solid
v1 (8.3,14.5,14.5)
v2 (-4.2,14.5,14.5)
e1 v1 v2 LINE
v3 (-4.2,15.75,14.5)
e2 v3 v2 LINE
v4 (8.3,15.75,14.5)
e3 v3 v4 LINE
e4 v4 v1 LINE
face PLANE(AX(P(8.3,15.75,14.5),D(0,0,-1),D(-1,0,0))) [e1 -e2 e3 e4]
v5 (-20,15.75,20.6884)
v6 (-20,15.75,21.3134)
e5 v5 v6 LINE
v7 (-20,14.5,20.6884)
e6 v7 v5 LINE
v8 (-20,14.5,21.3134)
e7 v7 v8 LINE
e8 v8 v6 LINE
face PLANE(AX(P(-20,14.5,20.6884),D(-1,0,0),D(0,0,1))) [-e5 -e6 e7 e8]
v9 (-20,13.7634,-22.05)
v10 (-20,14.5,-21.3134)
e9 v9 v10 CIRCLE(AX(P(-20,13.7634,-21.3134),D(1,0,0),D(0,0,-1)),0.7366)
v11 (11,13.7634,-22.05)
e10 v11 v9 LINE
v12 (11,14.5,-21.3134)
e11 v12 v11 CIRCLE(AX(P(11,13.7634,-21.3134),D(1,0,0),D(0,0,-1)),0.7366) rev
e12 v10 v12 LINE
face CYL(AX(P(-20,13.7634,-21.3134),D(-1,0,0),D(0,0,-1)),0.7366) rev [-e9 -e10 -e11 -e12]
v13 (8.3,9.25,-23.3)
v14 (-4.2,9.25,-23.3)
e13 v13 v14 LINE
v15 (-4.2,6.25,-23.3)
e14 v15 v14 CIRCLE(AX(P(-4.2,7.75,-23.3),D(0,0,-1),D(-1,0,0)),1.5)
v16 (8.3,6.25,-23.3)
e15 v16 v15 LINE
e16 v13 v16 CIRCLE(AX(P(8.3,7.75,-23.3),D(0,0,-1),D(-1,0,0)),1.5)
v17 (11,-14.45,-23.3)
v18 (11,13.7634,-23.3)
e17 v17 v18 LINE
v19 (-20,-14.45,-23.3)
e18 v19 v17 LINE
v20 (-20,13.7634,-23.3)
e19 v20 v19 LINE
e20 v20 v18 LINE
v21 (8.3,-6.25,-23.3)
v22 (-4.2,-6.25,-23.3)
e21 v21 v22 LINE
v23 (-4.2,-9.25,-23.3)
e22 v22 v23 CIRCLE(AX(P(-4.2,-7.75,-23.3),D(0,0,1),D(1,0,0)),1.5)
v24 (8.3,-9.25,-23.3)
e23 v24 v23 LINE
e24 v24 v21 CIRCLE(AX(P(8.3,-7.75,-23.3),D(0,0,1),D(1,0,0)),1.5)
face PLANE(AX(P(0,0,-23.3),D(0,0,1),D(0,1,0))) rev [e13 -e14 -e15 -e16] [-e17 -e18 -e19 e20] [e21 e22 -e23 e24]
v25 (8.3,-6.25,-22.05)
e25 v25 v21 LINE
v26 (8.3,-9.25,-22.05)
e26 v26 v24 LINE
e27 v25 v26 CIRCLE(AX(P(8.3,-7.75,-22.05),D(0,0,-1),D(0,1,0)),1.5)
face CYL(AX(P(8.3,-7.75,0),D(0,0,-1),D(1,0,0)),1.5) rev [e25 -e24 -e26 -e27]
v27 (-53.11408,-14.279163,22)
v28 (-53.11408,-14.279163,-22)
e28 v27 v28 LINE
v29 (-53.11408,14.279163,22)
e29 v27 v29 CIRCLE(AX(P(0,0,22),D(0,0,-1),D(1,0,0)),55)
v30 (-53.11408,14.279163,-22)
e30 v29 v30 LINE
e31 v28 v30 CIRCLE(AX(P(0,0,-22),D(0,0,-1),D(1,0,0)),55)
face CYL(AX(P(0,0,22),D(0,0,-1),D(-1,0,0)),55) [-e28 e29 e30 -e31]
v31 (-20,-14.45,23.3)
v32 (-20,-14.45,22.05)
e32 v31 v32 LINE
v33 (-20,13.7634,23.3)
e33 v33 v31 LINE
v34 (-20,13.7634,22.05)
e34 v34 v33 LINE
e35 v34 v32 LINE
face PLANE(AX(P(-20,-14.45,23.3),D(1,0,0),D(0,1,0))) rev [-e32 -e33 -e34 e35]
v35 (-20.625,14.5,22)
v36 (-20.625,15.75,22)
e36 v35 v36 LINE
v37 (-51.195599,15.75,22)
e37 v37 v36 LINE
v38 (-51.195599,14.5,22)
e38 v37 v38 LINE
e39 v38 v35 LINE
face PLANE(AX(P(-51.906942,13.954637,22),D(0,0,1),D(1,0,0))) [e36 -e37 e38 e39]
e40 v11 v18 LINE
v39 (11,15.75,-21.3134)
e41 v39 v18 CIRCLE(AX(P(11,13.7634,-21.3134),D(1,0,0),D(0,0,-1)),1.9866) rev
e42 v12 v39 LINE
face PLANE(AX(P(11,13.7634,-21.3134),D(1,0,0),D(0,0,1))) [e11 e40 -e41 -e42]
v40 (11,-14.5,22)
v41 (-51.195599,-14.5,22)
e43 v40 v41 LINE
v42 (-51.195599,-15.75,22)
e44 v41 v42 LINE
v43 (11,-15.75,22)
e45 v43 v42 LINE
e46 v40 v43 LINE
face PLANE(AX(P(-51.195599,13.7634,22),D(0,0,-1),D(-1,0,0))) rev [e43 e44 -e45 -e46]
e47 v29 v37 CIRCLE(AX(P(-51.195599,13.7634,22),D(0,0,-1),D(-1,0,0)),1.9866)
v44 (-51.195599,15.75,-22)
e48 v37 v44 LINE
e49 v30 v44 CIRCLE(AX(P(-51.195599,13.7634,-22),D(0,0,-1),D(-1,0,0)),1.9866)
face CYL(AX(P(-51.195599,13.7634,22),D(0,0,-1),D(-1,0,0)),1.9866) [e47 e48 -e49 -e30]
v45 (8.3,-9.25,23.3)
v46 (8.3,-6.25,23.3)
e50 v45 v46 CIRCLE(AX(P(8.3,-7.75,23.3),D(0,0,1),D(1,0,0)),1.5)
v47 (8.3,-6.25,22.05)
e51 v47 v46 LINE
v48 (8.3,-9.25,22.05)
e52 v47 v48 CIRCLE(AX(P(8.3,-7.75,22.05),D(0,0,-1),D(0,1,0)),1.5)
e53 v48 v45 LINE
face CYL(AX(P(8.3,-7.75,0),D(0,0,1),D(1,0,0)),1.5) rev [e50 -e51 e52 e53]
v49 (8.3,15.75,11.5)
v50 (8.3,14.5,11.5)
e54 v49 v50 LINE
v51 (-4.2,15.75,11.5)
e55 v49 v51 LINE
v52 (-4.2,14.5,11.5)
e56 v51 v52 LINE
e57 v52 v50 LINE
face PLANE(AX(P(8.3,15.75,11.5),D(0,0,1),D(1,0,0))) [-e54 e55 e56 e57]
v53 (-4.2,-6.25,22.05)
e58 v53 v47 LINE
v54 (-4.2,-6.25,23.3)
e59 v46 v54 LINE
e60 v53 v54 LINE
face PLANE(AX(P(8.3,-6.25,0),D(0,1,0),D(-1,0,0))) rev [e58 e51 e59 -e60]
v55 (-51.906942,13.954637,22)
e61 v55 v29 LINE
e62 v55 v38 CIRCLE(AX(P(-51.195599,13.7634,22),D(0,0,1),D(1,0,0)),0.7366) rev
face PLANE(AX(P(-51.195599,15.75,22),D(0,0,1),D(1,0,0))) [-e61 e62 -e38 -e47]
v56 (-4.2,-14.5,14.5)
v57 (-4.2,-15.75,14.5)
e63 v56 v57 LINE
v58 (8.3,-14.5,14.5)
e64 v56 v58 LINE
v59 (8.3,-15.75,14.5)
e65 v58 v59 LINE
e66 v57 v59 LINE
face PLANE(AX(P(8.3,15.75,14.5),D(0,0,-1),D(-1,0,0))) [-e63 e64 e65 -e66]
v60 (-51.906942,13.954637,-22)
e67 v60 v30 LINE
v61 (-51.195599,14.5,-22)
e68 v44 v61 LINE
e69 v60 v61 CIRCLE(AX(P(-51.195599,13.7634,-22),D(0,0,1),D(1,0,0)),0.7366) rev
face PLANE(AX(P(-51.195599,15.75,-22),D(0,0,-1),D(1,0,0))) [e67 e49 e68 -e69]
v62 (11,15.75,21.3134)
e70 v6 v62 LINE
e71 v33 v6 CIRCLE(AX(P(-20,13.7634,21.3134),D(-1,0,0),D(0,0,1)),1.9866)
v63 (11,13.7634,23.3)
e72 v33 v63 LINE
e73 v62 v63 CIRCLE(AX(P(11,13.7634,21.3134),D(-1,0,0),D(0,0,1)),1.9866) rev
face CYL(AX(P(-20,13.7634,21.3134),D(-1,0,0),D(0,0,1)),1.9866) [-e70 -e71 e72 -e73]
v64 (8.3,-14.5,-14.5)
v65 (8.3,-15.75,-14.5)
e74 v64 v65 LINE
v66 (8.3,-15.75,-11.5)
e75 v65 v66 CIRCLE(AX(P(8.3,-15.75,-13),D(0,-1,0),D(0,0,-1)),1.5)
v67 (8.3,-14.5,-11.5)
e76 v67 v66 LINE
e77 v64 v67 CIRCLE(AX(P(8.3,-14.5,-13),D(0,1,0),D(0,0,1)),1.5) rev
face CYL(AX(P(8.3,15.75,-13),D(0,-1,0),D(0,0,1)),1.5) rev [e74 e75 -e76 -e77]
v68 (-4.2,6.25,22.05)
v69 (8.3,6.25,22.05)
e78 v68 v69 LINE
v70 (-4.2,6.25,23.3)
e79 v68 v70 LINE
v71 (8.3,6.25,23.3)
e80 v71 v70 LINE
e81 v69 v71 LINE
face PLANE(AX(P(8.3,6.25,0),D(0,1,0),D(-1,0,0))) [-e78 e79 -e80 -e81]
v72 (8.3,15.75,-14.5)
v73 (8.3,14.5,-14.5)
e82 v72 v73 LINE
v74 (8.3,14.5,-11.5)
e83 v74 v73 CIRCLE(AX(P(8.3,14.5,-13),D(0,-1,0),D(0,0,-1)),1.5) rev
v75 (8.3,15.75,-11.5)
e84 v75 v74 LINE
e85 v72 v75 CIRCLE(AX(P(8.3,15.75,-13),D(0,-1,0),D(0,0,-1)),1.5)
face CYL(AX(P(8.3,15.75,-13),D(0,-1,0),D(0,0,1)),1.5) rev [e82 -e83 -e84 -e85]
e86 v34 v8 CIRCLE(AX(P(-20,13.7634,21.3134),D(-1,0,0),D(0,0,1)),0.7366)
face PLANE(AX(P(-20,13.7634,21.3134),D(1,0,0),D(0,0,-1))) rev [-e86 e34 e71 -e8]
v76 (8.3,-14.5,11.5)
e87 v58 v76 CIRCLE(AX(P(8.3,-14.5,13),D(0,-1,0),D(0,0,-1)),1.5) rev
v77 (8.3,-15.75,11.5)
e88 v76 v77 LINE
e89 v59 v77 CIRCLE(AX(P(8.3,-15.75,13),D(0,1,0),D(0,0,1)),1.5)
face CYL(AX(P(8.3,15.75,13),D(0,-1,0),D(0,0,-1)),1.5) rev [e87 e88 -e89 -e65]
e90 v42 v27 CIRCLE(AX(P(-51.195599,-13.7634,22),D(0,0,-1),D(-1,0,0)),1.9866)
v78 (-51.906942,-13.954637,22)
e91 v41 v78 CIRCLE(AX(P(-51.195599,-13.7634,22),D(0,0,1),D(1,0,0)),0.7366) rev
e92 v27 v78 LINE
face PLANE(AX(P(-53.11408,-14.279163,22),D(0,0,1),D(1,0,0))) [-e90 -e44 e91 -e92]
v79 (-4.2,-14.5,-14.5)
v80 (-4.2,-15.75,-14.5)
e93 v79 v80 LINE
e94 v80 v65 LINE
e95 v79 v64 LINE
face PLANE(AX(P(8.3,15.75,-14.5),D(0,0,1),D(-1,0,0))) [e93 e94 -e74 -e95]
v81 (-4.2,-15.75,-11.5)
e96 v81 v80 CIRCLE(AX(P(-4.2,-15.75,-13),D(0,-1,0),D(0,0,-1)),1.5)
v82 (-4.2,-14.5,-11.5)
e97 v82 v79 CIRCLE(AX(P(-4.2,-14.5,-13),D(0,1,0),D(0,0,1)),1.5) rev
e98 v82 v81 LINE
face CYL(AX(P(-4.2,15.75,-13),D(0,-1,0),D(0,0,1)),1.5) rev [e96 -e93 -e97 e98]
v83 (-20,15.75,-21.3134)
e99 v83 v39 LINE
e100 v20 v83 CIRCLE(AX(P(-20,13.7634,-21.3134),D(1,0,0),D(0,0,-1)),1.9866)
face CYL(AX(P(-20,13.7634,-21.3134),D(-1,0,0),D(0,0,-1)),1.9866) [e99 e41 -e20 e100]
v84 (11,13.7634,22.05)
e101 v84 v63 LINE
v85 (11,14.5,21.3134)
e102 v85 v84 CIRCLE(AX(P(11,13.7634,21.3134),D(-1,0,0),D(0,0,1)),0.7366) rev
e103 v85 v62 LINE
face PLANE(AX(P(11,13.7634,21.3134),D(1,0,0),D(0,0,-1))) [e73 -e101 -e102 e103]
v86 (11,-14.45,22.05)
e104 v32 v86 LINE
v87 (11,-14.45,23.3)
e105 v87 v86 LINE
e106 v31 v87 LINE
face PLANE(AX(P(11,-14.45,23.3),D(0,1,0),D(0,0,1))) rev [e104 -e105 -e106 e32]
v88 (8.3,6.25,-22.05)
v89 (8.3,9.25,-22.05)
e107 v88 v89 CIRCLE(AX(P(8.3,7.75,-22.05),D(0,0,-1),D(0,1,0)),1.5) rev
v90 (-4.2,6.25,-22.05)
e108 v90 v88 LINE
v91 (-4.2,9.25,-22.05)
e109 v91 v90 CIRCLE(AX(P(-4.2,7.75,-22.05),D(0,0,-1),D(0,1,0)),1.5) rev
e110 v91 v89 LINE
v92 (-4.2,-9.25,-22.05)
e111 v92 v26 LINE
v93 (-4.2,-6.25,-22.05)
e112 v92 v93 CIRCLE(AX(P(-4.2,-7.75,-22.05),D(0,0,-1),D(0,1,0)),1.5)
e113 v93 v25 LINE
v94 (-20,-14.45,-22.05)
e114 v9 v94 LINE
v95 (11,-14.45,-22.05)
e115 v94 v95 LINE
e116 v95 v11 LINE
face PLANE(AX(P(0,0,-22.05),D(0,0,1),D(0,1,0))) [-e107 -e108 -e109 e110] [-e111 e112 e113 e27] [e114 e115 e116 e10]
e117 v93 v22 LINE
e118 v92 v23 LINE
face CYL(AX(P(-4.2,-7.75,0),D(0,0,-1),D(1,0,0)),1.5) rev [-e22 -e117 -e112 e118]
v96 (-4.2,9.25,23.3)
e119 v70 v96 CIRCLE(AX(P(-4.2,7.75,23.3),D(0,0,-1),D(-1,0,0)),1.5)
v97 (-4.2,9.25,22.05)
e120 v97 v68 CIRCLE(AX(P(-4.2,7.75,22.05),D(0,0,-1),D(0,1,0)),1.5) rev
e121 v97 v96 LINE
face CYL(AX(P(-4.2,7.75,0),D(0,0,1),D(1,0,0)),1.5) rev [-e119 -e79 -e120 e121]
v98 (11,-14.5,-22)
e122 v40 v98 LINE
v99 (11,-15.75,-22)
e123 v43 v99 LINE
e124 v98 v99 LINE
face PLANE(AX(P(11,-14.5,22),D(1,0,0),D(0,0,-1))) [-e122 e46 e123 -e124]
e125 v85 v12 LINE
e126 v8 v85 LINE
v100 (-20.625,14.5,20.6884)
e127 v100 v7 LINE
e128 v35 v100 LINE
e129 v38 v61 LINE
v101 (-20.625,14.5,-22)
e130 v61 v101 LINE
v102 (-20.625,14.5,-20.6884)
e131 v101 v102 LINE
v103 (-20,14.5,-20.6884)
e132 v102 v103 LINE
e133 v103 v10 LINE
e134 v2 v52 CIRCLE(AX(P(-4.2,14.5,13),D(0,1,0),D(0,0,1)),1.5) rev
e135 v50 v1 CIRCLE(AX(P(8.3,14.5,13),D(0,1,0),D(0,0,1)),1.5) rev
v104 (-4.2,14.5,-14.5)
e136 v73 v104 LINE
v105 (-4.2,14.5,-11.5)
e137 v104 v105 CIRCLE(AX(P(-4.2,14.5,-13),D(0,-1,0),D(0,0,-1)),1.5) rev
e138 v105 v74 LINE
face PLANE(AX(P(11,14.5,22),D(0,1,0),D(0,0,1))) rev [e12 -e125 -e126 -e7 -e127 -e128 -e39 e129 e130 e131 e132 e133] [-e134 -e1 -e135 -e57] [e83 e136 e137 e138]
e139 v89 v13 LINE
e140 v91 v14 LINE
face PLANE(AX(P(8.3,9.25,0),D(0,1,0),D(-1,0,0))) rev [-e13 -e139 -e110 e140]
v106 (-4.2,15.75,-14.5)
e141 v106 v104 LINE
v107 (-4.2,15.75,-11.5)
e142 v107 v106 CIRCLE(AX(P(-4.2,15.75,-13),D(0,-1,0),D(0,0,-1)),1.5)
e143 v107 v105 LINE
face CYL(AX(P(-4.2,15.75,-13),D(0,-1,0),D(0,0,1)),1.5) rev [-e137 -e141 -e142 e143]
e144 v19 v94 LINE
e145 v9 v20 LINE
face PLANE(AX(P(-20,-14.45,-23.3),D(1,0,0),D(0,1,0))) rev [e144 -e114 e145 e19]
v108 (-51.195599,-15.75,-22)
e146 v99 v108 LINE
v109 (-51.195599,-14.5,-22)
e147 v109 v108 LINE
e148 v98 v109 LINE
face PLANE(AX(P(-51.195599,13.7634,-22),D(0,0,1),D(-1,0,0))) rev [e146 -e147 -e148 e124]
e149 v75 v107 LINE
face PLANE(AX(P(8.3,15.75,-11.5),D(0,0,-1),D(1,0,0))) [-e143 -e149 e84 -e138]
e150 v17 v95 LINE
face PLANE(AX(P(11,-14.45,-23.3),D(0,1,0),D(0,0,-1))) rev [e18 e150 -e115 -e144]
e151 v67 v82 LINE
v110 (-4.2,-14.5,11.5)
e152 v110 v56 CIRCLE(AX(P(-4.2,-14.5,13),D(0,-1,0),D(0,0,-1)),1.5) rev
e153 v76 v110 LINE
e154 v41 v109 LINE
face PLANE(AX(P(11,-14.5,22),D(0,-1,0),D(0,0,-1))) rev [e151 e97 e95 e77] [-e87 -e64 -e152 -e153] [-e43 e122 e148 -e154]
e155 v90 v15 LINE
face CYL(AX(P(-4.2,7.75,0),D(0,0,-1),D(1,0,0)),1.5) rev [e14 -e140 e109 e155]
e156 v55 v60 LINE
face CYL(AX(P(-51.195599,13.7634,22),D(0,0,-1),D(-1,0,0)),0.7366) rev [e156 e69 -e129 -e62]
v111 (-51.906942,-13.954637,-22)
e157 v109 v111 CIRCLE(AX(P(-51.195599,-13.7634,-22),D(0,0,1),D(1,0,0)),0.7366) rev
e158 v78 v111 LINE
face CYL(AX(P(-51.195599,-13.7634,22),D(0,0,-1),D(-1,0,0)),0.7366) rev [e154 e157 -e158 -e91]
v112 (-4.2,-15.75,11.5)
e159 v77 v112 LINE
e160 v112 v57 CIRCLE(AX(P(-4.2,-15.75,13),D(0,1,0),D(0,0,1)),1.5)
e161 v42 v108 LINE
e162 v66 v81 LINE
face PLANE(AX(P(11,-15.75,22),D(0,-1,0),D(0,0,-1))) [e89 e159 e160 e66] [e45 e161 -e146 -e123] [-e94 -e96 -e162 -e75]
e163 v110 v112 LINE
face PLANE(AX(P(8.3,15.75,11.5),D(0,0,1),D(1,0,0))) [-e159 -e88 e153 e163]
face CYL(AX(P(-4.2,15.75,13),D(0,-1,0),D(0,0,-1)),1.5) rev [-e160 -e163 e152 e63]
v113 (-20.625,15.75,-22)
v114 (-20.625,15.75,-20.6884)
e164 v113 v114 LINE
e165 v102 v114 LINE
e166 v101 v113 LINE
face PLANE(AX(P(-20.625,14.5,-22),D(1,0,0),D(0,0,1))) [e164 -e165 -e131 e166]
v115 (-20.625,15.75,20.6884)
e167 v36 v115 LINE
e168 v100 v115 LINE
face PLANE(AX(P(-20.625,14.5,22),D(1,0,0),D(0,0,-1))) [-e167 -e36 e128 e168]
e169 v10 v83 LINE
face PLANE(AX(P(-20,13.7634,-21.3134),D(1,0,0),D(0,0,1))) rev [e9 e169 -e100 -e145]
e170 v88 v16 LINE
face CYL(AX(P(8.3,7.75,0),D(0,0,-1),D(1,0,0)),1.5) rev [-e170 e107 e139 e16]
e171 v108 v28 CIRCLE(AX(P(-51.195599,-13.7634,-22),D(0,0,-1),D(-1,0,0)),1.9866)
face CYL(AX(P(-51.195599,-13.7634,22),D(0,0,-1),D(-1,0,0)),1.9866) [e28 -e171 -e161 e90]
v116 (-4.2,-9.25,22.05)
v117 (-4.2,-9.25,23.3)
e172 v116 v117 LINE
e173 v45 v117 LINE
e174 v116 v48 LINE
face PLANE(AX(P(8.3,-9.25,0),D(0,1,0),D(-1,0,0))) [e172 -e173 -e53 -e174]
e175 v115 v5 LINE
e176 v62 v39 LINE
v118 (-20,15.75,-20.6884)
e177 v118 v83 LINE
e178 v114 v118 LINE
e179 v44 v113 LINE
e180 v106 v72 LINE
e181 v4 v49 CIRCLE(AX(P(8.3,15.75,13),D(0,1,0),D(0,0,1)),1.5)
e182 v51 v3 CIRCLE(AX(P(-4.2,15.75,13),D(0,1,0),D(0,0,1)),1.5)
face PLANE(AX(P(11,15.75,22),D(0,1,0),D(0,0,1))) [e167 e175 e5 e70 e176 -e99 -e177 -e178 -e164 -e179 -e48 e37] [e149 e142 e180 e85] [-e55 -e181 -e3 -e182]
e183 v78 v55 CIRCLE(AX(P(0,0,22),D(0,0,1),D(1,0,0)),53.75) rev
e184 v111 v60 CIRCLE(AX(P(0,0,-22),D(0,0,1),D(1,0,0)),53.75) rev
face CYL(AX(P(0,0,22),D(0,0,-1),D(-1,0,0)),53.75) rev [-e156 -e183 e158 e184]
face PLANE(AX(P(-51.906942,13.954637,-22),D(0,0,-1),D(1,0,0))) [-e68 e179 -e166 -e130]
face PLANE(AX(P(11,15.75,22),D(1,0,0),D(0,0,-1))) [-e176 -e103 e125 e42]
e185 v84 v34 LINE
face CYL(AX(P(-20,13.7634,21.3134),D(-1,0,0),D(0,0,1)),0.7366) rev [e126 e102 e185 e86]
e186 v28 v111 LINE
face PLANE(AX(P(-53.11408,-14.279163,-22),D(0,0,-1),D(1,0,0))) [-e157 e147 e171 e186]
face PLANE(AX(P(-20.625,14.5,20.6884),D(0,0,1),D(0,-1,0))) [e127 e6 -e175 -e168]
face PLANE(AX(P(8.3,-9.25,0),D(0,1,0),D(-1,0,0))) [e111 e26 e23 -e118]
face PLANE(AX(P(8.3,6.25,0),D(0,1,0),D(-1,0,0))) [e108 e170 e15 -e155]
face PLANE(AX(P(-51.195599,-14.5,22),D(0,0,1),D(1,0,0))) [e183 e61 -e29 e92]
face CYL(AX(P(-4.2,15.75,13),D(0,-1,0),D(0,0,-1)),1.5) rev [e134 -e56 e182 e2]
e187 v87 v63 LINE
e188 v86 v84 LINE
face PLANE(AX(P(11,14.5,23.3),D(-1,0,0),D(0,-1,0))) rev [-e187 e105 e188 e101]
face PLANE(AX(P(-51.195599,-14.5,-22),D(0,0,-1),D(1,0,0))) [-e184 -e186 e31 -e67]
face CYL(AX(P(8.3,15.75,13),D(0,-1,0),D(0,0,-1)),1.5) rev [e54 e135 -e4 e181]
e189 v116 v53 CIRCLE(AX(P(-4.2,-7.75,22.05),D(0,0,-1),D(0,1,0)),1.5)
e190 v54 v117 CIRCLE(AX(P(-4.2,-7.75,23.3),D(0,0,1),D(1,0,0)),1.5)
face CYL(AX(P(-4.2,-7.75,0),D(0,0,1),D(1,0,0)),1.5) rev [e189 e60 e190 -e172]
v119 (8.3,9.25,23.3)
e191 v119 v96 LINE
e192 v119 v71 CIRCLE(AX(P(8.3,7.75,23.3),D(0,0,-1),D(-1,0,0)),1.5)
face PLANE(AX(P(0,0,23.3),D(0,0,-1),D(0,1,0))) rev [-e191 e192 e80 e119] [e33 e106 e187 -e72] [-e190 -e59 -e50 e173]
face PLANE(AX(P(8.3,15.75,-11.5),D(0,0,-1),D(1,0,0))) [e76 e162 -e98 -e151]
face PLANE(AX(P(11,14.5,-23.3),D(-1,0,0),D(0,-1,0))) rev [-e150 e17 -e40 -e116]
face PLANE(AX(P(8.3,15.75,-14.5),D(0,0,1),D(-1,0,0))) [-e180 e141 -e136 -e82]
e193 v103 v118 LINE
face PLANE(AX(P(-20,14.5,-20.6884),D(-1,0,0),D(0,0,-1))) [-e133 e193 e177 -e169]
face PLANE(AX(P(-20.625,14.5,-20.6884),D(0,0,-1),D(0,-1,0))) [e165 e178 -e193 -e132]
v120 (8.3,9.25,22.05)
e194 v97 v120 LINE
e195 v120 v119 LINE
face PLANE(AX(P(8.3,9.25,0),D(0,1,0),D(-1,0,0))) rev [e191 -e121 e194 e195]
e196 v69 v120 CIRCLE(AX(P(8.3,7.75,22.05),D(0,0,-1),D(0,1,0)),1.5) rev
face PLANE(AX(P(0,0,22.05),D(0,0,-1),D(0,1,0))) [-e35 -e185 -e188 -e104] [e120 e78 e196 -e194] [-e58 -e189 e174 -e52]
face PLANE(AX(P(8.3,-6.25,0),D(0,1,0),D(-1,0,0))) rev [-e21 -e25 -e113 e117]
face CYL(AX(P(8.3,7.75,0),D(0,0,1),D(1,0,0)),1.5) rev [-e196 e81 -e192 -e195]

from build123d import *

# Parameters (mm, degrees)
BASE_FLANGE1_DEPTH            = 22
CUT_EXTRUDE1_DEPTH            = 62.294881516
CUT_EXTRUDE1_DEPTH_BACK       = 62.294881516
EDGE_FLANGE3_STRIP_W          = 6.5232
EDGE_FLANGE3_STRIP_H          = 1.25
EDGE_FLANGE3_STRIP_CUT_DEPTH  = 31
EDGE_FLANGE3_RELIEF_W         = 7.1482
EDGE_FLANGE3_RELIEF_H         = 0.625
EDGE_FLANGE3_RELIEF_CUT_DEPTH = 1.25
EDGE_FLANGE3_DEPTH            = 31
CUT_EXTRUDE2_DEPTH            = 62.773396377


# Read off the part's stored shape, not the designer's step: Base-Flange1
# Sheet-metal steps are written as plain solids
with BuildPart() as part:
    # Base-Flange1 outline → Base-Flange1 (new body)
    with BuildSketch(Plane.XY):
        with BuildLine():
            Line((-51.19559942, 14.5), (11, 14.5))
            Line((11, 14.5), (11, 15.75))
            Line((11, 15.75), (-51.19559942, 15.75))
            ThreePointArc((-51.19559942, 15.75), (-52.404310309, 15.339977796), (-53.114079989, 14.279163381))
            ThreePointArc((-53.114079989, 14.279163381), (-55, 0), (-53.114079989, -14.279163381))
            ThreePointArc((-53.114079989, -14.279163381), (-52.404310309, -15.339977796), (-51.19559942, -15.75))
            Line((-51.19559942, -15.75), (11, -15.75))
            Line((11, -15.75), (11, -14.5))
            Line((11, -14.5), (-51.19559942, -14.5))
            ThreePointArc((-51.19559942, -14.5), (-51.643770386, -14.347970223), (-51.906941808, -13.954636941))
            ThreePointArc((-51.906941808, -13.954636941), (-53.75, 0), (-51.906941808, 13.954636941))
            ThreePointArc((-51.906941808, 13.954636941), (-51.643770386, 14.347970223), (-51.19559942, 14.5))
        make_face()
    extrude(amount=BASE_FLANGE1_DEPTH)

    # Sketch2 → Cut-Extrude1 (cut, two sides: drawn at the far end of the back side and taken through both)
    with BuildSketch(Plane(origin=(0, 0, 0), x_dir=(1, 0, 0), z_dir=(0, 1, 0)).offset(-CUT_EXTRUDE1_DEPTH_BACK)):
        with BuildLine():
            Line((8.3, -11.5), (-4.2, -11.5))
            ThreePointArc((-4.2, -11.5), (-5.7, -13), (-4.2, -14.5))
            Line((-4.2, -14.5), (8.3, -14.5))
            ThreePointArc((8.3, -14.5), (9.8, -13), (8.3, -11.5))
        make_face()
        with BuildLine():
            Line((8.3, 14.5), (-4.2, 14.5))
            ThreePointArc((-4.2, 14.5), (-5.7, 13), (-4.2, 11.5))
            Line((-4.2, 11.5), (8.3, 11.5))
            ThreePointArc((8.3, 11.5), (9.8, 13), (8.3, 14.5))
        make_face()
    extrude(amount=CUT_EXTRUDE1_DEPTH + CUT_EXTRUDE1_DEPTH_BACK, mode=Mode.SUBTRACT)

    # Edge-Flange3 strip (across the edge) → Edge-Flange3 strip cut (cut)
    with BuildSketch(Plane(origin=(11, 14.5, 22.05), x_dir=(0, 0, -1), z_dir=(-1, 0, 0))):
        with Locations((-2.525, -0.625)):
            Rectangle(EDGE_FLANGE3_STRIP_W, EDGE_FLANGE3_STRIP_H)
    extrude(amount=EDGE_FLANGE3_STRIP_CUT_DEPTH, mode=Mode.SUBTRACT)

    # Edge-Flange3 relief (on the sheet) → Edge-Flange3 relief cut (cut)
    with BuildSketch(Plane(origin=(11, 14.5, 21.3134), x_dir=(0, 0, -1), z_dir=(0, -1, 0))):
        with Locations((-2.9491, -31.3125)):
            Rectangle(EDGE_FLANGE3_RELIEF_W, EDGE_FLANGE3_RELIEF_H)
    extrude(amount=-EDGE_FLANGE3_RELIEF_CUT_DEPTH, mode=Mode.SUBTRACT)

    # Edge-Flange3 section (across the edge) → Edge-Flange3 (add)
    with BuildSketch(Plane(origin=(11, 14.5, 22.05), x_dir=(0, 0, -1), z_dir=(-1, 0, 0))):
        with BuildLine():
            Line((-1.25, 0.7366), (-1.25, 28.95))
            Line((-1.25, 28.95), (0, 28.95))
            Line((0, 28.95), (0, 0.7366))
            ThreePointArc((0, 0.7366), (0.215745145, 0.215745145), (0.7366, 0))
            Line((0.7366, 0), (0.7366, -1.25))
            ThreePointArc((0.7366, -1.25), (-0.668138332, -0.668138332), (-1.25, 0.7366))
        make_face()
    extrude(amount=EDGE_FLANGE3_DEPTH)

    # Sketch29 → Cut-Extrude2 (cut, through all)
    with BuildSketch(Plane.XY.offset(23.3)):
        with BuildLine():
            Line((8.3, -6.25), (-4.2, -6.25))
            ThreePointArc((-4.2, -6.25), (-5.7, -7.75), (-4.2, -9.25))
            Line((-4.2, -9.25), (8.3, -9.25))
            ThreePointArc((8.3, -9.25), (9.8, -7.75), (8.3, -6.25))
        make_face()
        with BuildLine():
            Line((8.3, 6.25), (-4.2, 6.25))
            ThreePointArc((-4.2, 6.25), (-5.7, 7.75), (-4.2, 9.25))
            Line((-4.2, 9.25), (8.3, 9.25))
            ThreePointArc((8.3, 9.25), (9.8, 7.75), (8.3, 6.25))
        make_face()
    extrude(amount=-CUT_EXTRUDE2_DEPTH, mode=Mode.SUBTRACT)

    # Mirror1: part across plane


with BuildPart() as part_1:
    add(part.part)
    add(part.part.mirror(Plane(origin=(-51.906941808, -13.954636941, 0), x_dir=(1, 0, 0), z_dir=(0, 0, -1))))


solid = part_1.part
